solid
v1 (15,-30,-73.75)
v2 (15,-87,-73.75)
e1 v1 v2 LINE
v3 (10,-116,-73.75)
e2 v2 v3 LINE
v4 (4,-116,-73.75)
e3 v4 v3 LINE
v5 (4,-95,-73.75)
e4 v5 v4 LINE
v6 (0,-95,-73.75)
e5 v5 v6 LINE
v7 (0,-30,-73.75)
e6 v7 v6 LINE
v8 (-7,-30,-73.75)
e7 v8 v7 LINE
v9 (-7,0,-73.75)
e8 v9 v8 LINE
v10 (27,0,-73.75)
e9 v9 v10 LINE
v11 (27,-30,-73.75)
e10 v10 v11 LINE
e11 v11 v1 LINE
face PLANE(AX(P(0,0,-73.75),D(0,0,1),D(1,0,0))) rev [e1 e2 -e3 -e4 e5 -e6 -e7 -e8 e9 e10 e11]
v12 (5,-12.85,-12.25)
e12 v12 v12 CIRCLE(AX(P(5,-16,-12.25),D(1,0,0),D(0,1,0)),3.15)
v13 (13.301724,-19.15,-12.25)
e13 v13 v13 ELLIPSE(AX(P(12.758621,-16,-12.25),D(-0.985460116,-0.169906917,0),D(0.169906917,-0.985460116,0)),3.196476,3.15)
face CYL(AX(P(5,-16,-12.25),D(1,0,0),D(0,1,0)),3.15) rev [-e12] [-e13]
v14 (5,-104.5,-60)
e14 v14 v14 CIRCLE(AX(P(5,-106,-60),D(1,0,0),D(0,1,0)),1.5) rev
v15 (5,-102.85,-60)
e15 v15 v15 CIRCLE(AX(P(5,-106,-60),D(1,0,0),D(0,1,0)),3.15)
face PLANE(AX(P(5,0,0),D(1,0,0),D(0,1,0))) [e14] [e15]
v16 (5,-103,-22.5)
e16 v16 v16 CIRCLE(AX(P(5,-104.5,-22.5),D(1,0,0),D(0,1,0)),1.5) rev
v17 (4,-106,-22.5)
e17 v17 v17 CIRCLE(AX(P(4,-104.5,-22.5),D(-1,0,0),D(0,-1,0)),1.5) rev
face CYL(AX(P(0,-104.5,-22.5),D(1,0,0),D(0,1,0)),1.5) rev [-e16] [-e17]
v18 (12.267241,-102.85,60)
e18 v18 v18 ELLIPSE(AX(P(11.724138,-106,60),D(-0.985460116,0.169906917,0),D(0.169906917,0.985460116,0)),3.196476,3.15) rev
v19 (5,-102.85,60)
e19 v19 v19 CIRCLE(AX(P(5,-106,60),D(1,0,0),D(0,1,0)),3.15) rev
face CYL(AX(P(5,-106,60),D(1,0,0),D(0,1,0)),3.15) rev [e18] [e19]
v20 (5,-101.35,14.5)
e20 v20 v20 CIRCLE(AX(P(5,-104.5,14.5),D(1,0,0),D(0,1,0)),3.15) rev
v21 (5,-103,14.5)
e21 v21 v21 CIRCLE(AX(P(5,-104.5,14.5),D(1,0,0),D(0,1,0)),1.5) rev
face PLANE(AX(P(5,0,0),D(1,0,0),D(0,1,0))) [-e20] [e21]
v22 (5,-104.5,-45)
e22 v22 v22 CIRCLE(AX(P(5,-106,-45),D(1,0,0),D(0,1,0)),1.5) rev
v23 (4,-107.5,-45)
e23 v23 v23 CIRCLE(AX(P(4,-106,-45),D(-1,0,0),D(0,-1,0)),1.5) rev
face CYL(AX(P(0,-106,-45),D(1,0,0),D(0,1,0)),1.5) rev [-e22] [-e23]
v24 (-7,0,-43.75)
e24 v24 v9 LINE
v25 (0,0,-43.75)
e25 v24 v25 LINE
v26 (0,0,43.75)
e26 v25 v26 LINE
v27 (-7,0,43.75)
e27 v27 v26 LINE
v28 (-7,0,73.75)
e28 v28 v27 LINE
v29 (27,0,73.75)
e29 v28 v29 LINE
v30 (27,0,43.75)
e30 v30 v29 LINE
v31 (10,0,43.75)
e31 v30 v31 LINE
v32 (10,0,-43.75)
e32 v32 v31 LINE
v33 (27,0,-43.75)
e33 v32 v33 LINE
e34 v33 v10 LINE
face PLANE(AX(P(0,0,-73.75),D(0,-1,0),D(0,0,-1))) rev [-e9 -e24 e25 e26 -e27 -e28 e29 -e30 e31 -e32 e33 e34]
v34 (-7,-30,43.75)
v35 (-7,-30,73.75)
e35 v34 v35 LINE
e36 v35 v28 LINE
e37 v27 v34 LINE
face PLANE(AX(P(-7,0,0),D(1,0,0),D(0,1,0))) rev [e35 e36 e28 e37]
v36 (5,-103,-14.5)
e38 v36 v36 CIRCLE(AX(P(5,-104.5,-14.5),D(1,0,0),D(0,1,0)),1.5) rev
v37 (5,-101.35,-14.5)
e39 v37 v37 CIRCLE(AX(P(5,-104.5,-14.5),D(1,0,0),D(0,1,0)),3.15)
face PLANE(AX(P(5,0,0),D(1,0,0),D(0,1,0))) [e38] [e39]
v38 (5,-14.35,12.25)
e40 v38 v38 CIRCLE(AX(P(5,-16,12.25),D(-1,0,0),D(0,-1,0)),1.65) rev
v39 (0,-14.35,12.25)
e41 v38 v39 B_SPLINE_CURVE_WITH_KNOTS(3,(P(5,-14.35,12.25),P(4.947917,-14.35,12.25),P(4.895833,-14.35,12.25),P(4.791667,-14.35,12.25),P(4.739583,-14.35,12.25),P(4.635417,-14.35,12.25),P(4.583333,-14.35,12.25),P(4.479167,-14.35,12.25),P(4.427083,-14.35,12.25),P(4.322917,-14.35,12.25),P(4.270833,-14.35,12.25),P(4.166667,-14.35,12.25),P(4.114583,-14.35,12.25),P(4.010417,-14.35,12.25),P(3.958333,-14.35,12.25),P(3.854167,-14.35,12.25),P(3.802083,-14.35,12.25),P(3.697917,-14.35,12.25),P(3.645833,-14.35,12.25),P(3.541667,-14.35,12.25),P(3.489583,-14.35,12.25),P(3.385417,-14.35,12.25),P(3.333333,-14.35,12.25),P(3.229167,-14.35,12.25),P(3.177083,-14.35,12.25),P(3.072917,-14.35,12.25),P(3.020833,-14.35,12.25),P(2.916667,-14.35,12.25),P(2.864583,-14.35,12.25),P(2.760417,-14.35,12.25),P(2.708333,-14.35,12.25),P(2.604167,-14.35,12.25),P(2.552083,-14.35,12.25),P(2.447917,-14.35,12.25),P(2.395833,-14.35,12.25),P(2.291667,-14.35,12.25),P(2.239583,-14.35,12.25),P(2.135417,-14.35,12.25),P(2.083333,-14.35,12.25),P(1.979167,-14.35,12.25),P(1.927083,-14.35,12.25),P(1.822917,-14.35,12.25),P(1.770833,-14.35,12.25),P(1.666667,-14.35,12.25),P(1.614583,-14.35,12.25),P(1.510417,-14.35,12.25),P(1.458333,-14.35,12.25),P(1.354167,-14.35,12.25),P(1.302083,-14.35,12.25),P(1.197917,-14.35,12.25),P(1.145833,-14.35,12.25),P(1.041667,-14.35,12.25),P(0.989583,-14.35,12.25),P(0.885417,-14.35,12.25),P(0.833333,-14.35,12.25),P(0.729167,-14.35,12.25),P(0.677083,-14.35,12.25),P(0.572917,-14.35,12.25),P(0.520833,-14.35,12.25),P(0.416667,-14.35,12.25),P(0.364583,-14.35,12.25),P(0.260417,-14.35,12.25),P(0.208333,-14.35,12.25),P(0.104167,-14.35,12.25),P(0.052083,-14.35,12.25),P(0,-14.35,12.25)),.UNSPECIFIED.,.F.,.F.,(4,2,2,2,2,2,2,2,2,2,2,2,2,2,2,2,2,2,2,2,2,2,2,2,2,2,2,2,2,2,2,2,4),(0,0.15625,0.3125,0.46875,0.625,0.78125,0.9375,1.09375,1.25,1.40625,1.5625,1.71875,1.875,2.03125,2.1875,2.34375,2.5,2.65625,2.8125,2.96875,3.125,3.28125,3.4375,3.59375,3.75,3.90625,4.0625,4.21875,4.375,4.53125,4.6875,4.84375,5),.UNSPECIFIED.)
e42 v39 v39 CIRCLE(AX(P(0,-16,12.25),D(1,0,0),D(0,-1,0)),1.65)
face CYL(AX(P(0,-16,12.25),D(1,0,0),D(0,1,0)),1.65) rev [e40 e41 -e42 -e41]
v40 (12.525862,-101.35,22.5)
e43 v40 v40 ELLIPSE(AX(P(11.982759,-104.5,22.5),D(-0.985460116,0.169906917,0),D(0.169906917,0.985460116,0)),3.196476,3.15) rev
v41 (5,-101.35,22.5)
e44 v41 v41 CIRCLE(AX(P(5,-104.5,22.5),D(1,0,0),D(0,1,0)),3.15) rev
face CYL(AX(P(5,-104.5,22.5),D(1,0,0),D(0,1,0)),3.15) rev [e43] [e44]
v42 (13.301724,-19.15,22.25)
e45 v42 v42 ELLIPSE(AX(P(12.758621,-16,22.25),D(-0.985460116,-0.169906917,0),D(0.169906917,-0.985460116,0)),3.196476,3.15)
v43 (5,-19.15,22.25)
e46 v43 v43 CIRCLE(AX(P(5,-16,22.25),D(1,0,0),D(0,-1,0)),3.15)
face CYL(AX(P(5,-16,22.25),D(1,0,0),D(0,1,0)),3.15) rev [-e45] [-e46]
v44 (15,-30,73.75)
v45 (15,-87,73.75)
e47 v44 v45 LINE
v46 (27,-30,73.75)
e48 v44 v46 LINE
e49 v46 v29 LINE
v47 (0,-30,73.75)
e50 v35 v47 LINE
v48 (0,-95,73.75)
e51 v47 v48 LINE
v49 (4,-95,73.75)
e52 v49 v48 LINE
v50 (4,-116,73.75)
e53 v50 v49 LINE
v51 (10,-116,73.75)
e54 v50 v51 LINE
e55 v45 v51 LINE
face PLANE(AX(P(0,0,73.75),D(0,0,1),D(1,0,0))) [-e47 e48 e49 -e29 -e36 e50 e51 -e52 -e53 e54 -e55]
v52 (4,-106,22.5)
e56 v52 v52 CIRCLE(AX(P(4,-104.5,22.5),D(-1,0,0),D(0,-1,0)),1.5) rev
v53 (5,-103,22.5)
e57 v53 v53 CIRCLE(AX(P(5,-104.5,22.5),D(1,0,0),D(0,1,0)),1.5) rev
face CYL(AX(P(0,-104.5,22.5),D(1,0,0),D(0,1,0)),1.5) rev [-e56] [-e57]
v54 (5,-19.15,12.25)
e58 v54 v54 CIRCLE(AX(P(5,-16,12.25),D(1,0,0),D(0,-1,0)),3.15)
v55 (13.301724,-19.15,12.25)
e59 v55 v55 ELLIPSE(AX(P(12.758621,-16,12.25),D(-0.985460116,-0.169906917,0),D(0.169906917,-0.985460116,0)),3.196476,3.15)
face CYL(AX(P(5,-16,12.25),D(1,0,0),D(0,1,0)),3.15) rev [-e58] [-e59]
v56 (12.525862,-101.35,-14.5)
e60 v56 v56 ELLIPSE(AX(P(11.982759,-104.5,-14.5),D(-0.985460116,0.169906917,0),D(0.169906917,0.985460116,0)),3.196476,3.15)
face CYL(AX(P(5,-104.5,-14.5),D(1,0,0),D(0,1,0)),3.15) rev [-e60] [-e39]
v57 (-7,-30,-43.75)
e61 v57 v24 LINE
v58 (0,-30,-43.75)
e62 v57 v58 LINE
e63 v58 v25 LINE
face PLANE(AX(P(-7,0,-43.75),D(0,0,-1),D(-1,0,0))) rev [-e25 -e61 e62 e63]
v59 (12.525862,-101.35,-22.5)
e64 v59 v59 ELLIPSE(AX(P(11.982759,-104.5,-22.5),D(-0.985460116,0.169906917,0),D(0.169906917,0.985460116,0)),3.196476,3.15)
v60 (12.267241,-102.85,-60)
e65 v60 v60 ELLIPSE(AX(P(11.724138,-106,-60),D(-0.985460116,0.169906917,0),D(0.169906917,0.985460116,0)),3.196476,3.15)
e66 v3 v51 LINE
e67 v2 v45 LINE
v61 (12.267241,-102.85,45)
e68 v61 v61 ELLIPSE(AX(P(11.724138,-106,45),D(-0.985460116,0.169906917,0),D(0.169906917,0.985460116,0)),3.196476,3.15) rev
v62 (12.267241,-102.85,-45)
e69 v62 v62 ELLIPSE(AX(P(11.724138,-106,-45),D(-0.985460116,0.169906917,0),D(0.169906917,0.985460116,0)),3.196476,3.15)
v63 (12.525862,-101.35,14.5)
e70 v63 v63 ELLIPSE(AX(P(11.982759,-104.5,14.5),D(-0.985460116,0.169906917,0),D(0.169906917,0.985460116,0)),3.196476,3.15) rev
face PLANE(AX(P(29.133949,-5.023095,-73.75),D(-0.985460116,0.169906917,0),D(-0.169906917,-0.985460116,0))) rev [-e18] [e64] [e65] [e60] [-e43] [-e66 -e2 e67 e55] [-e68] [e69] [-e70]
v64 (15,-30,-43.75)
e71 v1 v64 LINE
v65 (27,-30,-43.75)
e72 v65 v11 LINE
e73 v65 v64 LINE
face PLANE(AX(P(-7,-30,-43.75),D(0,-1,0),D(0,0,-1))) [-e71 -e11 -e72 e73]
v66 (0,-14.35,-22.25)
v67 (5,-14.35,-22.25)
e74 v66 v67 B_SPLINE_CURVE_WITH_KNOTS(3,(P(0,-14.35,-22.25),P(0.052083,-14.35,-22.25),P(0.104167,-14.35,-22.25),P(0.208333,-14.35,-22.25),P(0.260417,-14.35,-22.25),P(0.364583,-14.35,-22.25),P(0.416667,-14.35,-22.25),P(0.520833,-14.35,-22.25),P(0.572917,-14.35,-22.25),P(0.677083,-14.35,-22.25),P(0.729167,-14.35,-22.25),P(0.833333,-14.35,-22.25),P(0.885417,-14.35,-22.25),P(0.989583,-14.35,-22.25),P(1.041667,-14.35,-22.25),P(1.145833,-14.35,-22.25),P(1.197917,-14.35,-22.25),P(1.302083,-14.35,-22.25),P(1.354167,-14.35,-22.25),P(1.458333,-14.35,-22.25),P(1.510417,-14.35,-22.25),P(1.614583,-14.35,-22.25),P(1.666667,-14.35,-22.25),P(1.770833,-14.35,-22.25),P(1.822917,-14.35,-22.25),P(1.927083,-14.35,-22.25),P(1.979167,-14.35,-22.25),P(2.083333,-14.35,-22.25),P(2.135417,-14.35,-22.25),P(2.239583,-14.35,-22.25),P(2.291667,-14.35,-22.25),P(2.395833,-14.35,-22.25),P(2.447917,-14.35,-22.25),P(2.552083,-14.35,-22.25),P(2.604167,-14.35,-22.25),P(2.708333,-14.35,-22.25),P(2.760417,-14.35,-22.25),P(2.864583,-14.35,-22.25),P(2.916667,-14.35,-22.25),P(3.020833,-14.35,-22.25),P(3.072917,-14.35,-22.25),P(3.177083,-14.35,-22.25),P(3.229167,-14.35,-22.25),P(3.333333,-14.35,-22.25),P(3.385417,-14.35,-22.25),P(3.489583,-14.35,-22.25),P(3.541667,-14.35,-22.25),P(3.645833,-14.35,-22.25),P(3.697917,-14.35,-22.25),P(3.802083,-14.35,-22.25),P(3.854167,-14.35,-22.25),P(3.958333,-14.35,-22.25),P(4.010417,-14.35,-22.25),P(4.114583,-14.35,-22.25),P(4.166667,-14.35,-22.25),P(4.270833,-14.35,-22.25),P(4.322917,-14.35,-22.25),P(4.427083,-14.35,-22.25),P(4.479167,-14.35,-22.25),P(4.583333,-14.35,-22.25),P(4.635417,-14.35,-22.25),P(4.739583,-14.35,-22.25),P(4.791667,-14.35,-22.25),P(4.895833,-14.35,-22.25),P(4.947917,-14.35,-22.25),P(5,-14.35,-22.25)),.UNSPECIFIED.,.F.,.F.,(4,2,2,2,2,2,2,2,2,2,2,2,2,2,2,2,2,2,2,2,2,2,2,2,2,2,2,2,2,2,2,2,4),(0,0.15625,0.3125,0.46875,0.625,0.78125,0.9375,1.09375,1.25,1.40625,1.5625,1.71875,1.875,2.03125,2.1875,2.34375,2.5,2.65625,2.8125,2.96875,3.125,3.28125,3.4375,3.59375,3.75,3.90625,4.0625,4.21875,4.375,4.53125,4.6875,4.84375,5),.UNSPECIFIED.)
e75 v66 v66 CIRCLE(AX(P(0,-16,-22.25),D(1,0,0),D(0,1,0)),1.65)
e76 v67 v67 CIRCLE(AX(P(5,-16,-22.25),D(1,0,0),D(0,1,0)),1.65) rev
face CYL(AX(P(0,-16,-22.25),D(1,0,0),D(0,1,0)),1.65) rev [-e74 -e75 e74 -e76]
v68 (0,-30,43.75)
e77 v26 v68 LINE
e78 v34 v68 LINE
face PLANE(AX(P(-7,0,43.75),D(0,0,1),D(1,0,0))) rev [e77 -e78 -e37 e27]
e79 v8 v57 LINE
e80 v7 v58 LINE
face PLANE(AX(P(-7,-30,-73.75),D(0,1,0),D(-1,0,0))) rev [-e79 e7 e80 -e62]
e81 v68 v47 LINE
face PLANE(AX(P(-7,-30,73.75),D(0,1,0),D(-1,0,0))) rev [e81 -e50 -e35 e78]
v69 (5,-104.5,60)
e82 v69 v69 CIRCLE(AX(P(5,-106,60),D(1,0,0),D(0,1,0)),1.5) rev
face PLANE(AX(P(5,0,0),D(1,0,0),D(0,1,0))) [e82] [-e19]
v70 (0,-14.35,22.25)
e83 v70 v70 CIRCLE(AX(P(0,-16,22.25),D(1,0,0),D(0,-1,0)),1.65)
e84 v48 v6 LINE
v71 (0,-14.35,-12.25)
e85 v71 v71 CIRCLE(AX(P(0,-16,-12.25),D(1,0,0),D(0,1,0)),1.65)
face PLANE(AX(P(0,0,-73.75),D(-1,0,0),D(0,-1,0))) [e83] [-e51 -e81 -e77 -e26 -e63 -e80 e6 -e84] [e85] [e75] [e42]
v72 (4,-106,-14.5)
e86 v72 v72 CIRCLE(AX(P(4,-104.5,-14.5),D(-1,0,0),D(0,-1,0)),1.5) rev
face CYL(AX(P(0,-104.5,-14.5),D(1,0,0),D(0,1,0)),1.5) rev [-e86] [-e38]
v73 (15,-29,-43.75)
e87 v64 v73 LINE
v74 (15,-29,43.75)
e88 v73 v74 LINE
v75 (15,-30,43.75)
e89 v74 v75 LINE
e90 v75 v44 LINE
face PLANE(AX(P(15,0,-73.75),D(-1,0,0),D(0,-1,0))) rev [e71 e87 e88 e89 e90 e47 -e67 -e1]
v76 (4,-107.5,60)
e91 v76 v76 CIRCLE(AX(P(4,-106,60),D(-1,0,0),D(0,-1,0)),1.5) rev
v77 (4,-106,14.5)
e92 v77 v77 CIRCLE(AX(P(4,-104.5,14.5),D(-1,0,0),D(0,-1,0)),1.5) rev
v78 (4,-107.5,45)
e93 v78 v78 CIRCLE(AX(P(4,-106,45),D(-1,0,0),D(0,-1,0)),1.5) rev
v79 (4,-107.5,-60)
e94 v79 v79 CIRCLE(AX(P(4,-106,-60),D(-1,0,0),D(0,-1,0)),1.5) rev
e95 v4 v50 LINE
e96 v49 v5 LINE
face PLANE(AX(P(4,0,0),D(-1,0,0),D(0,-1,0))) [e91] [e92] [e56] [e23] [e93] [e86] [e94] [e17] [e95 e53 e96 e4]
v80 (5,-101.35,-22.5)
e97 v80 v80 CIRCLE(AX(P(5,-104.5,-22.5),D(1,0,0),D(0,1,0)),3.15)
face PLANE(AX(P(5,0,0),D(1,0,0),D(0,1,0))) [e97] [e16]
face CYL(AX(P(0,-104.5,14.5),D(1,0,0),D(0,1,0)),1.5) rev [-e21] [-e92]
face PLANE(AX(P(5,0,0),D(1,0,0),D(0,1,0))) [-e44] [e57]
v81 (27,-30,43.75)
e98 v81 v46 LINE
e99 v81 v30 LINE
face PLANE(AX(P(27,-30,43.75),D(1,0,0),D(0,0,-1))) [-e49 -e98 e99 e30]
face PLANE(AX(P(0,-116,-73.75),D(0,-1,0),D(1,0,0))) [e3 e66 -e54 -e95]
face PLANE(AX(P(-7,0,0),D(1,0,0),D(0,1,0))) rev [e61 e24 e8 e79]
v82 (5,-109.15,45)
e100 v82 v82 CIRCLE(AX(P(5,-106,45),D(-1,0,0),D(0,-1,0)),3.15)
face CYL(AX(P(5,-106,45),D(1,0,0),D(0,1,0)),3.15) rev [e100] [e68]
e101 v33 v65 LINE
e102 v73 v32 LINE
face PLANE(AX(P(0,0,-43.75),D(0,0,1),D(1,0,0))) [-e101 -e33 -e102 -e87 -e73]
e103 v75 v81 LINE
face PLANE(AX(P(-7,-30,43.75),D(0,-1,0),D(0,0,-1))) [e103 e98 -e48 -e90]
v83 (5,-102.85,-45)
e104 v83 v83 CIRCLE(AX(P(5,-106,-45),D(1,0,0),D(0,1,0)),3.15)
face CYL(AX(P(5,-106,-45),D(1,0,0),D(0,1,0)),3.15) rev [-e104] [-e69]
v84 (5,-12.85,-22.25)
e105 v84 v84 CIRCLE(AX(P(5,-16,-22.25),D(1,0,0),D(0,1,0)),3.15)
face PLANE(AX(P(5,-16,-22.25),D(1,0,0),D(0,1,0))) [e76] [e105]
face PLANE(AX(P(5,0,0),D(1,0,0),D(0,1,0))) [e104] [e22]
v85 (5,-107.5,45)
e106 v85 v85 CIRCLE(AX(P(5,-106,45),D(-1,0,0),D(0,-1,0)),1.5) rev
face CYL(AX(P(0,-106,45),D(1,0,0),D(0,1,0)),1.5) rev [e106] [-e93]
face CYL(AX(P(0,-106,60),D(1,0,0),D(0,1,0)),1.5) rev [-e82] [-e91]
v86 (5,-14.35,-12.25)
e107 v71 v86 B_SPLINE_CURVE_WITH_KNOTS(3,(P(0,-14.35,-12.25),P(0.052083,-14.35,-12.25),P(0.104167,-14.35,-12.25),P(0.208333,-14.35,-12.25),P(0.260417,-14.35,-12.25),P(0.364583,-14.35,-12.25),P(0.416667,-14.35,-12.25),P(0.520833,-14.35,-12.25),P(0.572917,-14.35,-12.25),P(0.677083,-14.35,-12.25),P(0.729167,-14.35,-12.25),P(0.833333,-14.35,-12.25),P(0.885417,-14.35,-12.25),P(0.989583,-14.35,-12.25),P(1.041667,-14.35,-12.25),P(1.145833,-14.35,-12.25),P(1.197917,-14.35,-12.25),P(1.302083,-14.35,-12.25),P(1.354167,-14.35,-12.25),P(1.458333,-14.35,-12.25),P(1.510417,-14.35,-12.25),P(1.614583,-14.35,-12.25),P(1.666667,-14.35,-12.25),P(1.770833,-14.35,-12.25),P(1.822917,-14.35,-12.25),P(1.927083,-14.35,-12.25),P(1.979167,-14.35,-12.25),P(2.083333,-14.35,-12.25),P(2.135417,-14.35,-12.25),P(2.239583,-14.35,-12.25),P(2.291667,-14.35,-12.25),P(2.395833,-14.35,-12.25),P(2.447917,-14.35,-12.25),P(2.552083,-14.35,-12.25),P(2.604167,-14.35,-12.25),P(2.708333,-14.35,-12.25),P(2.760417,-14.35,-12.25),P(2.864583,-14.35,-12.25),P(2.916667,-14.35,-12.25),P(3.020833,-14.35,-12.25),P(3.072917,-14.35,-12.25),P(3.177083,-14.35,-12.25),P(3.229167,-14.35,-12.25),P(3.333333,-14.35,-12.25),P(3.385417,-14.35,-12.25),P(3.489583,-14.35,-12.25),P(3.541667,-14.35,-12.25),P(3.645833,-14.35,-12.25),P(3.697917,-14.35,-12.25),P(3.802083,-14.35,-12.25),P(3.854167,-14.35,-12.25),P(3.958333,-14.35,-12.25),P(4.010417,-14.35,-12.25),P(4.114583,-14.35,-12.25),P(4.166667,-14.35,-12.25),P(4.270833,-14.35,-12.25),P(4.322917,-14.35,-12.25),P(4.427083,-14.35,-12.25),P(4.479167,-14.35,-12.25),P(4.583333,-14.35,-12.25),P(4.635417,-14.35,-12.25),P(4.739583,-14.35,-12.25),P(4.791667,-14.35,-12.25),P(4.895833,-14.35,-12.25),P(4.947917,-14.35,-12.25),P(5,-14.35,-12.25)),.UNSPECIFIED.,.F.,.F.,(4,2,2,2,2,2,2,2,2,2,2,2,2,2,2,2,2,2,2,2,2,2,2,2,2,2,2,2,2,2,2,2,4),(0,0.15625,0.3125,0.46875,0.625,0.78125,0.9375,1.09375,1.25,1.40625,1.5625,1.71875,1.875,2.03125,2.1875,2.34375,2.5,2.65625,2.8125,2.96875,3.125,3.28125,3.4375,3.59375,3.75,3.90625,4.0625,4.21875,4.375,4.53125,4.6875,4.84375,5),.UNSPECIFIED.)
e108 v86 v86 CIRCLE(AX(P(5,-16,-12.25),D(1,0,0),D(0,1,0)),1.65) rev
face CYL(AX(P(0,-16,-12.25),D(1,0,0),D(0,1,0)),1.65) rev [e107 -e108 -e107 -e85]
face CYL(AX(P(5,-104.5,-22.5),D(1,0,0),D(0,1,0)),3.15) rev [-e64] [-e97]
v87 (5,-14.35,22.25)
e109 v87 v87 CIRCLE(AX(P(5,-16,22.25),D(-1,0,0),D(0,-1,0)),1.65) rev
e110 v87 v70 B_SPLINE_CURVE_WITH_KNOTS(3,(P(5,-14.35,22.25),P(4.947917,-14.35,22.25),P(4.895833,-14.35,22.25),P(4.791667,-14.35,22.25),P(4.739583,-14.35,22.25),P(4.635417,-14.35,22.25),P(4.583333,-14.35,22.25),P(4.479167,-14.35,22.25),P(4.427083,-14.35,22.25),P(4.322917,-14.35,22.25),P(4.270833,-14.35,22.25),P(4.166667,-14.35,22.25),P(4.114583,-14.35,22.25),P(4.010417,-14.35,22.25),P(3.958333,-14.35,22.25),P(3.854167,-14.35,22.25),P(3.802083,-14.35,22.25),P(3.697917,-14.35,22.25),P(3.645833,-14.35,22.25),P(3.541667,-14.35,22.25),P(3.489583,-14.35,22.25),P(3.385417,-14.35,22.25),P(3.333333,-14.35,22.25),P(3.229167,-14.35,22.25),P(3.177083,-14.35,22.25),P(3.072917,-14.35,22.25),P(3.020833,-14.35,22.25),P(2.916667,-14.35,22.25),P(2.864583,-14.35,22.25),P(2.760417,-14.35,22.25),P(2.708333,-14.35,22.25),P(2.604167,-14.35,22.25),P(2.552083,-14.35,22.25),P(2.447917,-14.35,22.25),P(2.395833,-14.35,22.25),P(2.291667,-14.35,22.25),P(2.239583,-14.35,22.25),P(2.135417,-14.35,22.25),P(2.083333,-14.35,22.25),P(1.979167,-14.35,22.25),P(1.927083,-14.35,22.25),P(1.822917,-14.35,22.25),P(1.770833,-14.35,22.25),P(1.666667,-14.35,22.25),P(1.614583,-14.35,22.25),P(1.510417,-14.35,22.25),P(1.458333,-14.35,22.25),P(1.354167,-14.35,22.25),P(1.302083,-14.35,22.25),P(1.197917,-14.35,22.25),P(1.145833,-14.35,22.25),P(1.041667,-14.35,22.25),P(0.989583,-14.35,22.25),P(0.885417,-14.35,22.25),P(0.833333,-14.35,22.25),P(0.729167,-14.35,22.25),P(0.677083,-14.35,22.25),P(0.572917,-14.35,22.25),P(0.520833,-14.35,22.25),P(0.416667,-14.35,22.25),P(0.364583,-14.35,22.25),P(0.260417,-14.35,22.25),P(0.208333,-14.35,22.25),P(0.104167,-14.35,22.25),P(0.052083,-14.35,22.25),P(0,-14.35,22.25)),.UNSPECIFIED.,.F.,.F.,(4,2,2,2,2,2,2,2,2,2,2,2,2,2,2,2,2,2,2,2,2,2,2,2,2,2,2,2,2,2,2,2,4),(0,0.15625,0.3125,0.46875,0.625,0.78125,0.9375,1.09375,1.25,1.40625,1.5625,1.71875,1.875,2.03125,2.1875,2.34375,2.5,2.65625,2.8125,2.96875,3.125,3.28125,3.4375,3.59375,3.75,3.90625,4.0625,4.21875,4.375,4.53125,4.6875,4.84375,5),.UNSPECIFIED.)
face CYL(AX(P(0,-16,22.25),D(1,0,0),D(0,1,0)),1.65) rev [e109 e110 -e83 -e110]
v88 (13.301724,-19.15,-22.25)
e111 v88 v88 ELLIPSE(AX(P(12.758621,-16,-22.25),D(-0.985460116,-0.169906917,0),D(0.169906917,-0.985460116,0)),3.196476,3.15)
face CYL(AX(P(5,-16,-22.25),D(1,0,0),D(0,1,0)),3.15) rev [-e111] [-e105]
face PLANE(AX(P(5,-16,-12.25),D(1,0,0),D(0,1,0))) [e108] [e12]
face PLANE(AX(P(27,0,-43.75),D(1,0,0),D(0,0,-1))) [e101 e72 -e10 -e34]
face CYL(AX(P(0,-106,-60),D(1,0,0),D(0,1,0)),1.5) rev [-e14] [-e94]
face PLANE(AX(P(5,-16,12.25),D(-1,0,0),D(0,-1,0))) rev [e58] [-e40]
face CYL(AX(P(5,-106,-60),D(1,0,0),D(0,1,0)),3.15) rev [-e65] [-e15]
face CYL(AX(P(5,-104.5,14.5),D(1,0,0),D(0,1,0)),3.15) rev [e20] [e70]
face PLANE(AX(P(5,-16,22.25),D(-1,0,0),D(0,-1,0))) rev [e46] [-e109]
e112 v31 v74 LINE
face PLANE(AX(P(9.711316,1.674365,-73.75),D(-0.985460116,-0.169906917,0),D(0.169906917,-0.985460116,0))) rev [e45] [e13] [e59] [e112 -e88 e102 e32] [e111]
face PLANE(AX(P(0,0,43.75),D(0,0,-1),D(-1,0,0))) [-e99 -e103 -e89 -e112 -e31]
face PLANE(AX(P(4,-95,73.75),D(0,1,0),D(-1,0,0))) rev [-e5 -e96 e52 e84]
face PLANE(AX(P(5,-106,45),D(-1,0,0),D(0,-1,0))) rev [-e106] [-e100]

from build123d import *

# Parameters (mm, degrees)
BOSS_EXTRUDE1_DEPTH      = 73.75
BOSS_EXTRUDE1_DEPTH_BACK = 73.75
SKETCH2_R                = 1.5
CUT_EXTRUDE1_DEPTH       = 139.275314138
SKETCH3_R                = 3.15
CUT_EXTRUDE2_DEPTH       = 10
SKETCH4_W                = 147.5
SKETCH4_H                = 21
CUT_EXTRUDE3_DEPTH       = 4
SKETCH6_R                = 1.65
CUT_EXTRUDE4_DEPTH       = 139.275314138
SKETCH7_R                = 3.15
CUT_EXTRUDE6_DEPTH       = 10
SKETCH8_W                = 30
SKETCH8_H                = 30
BOSS_EXTRUDE2_DEPTH      = 7
SKETCH9_W                = 34
SKETCH9_H                = 30
BOSS_EXTRUDE3_DEPTH      = 30
SKETCH10_W               = 34
SKETCH10_H               = 30
BOSS_EXTRUDE4_DEPTH      = 30


with BuildPart() as part:
    # Sketch1 → Boss-Extrude1 (new, two sides: drawn at the far end of the back side and taken through both)
    with BuildSketch(Plane.XY.offset(-BOSS_EXTRUDE1_DEPTH_BACK)):
        Polygon((0, 0), (0, -116), (10, -116), (15, -87), (15, -29), (10, 0), align=None)
    extrude(amount=BOSS_EXTRUDE1_DEPTH + BOSS_EXTRUDE1_DEPTH_BACK)

    # Sketch2 → Cut-Extrude1 (cut, through all)
    with BuildSketch(Plane(origin=(15, 0, 0), x_dir=(0, 0, -1), z_dir=(1, 0, 0))):
        with Locations((60, -106)):
            Circle(SKETCH2_R)
        with Locations((45, -106)):
            Circle(SKETCH2_R)
        with Locations((22.5, -104.5)):
            Circle(SKETCH2_R)
        with Locations((14.5, -104.5)):
            Circle(SKETCH2_R)
        with Locations((-14.5, -104.5)):
            Circle(SKETCH2_R)
        with Locations((-22.5, -104.5)):
            Circle(SKETCH2_R)
        with Locations((-45, -106)):
            Circle(SKETCH2_R)
        with Locations((-60, -106)):
            Circle(SKETCH2_R)
    extrude(amount=-CUT_EXTRUDE1_DEPTH, mode=Mode.SUBTRACT)

    # Sketch3 → Cut-Extrude2 (cut)
    with BuildSketch(Plane(origin=(15, 0, 0), x_dir=(0, 0, -1), z_dir=(1, 0, 0))):
        with Locations((60, -106)):
            Circle(SKETCH3_R)
        with Locations((45, -106)):
            Circle(SKETCH3_R)
        with Locations((22.5, -104.5)):
            Circle(SKETCH3_R)
        with Locations((14.5, -104.5)):
            Circle(SKETCH3_R)
        with Locations((-14.5, -104.5)):
            Circle(SKETCH3_R)
        with Locations((-22.5, -104.5)):
            Circle(SKETCH3_R)
        with Locations((-45, -106)):
            Circle(SKETCH3_R)
        with Locations((-60, -106)):
            Circle(SKETCH3_R)
    extrude(amount=-CUT_EXTRUDE2_DEPTH, mode=Mode.SUBTRACT)

    # Sketch4 → Cut-Extrude3 (cut)
    with BuildSketch(Plane.ZY):
        with Locations((0, -105.5)):
            Rectangle(SKETCH4_W, SKETCH4_H)
    extrude(amount=-CUT_EXTRUDE3_DEPTH, mode=Mode.SUBTRACT)

    # Sketch6 → Cut-Extrude4 (cut, through all)
    with BuildSketch(Plane(origin=(15, 0, 0), x_dir=(0, 0, -1), z_dir=(1, 0, 0))):
        with Locations((12.25, -16)):
            Circle(SKETCH6_R)
        with Locations((22.25, -16)):
            Circle(SKETCH6_R)
        with Locations((-22.25, -16)):
            Circle(SKETCH6_R)
        with Locations((-12.25, -16)):
            Circle(SKETCH6_R)
    extrude(amount=-CUT_EXTRUDE4_DEPTH, mode=Mode.SUBTRACT)

    # Sketch7 → Cut-Extrude6 (cut)
    with BuildSketch(Plane(origin=(15, 0, 0), x_dir=(0, 0, -1), z_dir=(1, 0, 0))):
        with Locations((22.25, -16)):
            Circle(SKETCH7_R)
        with Locations((12.25, -16)):
            Circle(SKETCH7_R)
        with Locations((-12.25, -16)):
            Circle(SKETCH7_R)
        with Locations((-22.25, -16)):
            Circle(SKETCH7_R)
    extrude(amount=-CUT_EXTRUDE6_DEPTH, mode=Mode.SUBTRACT)

    # Sketch8 → Boss-Extrude2 (add)
    with BuildSketch(Plane.ZY):
        with Locations((58.75, -15)):
            Rectangle(SKETCH8_W, SKETCH8_H)
        with Locations((-58.75, -15)):
            Rectangle(SKETCH8_W, SKETCH8_H)
    extrude(amount=BOSS_EXTRUDE2_DEPTH)

    # Sketch9 → Boss-Extrude3 (add)
    with BuildSketch(Plane.XY.offset(73.75)):
        with Locations((10, -15)):
            Rectangle(SKETCH9_W, SKETCH9_H)
    extrude(amount=-BOSS_EXTRUDE3_DEPTH)

    # Sketch10 → Boss-Extrude4 (add)
    with BuildSketch(Plane(origin=(0, 0, -73.75), x_dir=(-1, 0, 0), z_dir=(0, 0, -1))):
        with Locations((-10, -15)):
            Rectangle(SKETCH10_W, SKETCH10_H)
    extrude(amount=-BOSS_EXTRUDE4_DEPTH)


solid = part.part
